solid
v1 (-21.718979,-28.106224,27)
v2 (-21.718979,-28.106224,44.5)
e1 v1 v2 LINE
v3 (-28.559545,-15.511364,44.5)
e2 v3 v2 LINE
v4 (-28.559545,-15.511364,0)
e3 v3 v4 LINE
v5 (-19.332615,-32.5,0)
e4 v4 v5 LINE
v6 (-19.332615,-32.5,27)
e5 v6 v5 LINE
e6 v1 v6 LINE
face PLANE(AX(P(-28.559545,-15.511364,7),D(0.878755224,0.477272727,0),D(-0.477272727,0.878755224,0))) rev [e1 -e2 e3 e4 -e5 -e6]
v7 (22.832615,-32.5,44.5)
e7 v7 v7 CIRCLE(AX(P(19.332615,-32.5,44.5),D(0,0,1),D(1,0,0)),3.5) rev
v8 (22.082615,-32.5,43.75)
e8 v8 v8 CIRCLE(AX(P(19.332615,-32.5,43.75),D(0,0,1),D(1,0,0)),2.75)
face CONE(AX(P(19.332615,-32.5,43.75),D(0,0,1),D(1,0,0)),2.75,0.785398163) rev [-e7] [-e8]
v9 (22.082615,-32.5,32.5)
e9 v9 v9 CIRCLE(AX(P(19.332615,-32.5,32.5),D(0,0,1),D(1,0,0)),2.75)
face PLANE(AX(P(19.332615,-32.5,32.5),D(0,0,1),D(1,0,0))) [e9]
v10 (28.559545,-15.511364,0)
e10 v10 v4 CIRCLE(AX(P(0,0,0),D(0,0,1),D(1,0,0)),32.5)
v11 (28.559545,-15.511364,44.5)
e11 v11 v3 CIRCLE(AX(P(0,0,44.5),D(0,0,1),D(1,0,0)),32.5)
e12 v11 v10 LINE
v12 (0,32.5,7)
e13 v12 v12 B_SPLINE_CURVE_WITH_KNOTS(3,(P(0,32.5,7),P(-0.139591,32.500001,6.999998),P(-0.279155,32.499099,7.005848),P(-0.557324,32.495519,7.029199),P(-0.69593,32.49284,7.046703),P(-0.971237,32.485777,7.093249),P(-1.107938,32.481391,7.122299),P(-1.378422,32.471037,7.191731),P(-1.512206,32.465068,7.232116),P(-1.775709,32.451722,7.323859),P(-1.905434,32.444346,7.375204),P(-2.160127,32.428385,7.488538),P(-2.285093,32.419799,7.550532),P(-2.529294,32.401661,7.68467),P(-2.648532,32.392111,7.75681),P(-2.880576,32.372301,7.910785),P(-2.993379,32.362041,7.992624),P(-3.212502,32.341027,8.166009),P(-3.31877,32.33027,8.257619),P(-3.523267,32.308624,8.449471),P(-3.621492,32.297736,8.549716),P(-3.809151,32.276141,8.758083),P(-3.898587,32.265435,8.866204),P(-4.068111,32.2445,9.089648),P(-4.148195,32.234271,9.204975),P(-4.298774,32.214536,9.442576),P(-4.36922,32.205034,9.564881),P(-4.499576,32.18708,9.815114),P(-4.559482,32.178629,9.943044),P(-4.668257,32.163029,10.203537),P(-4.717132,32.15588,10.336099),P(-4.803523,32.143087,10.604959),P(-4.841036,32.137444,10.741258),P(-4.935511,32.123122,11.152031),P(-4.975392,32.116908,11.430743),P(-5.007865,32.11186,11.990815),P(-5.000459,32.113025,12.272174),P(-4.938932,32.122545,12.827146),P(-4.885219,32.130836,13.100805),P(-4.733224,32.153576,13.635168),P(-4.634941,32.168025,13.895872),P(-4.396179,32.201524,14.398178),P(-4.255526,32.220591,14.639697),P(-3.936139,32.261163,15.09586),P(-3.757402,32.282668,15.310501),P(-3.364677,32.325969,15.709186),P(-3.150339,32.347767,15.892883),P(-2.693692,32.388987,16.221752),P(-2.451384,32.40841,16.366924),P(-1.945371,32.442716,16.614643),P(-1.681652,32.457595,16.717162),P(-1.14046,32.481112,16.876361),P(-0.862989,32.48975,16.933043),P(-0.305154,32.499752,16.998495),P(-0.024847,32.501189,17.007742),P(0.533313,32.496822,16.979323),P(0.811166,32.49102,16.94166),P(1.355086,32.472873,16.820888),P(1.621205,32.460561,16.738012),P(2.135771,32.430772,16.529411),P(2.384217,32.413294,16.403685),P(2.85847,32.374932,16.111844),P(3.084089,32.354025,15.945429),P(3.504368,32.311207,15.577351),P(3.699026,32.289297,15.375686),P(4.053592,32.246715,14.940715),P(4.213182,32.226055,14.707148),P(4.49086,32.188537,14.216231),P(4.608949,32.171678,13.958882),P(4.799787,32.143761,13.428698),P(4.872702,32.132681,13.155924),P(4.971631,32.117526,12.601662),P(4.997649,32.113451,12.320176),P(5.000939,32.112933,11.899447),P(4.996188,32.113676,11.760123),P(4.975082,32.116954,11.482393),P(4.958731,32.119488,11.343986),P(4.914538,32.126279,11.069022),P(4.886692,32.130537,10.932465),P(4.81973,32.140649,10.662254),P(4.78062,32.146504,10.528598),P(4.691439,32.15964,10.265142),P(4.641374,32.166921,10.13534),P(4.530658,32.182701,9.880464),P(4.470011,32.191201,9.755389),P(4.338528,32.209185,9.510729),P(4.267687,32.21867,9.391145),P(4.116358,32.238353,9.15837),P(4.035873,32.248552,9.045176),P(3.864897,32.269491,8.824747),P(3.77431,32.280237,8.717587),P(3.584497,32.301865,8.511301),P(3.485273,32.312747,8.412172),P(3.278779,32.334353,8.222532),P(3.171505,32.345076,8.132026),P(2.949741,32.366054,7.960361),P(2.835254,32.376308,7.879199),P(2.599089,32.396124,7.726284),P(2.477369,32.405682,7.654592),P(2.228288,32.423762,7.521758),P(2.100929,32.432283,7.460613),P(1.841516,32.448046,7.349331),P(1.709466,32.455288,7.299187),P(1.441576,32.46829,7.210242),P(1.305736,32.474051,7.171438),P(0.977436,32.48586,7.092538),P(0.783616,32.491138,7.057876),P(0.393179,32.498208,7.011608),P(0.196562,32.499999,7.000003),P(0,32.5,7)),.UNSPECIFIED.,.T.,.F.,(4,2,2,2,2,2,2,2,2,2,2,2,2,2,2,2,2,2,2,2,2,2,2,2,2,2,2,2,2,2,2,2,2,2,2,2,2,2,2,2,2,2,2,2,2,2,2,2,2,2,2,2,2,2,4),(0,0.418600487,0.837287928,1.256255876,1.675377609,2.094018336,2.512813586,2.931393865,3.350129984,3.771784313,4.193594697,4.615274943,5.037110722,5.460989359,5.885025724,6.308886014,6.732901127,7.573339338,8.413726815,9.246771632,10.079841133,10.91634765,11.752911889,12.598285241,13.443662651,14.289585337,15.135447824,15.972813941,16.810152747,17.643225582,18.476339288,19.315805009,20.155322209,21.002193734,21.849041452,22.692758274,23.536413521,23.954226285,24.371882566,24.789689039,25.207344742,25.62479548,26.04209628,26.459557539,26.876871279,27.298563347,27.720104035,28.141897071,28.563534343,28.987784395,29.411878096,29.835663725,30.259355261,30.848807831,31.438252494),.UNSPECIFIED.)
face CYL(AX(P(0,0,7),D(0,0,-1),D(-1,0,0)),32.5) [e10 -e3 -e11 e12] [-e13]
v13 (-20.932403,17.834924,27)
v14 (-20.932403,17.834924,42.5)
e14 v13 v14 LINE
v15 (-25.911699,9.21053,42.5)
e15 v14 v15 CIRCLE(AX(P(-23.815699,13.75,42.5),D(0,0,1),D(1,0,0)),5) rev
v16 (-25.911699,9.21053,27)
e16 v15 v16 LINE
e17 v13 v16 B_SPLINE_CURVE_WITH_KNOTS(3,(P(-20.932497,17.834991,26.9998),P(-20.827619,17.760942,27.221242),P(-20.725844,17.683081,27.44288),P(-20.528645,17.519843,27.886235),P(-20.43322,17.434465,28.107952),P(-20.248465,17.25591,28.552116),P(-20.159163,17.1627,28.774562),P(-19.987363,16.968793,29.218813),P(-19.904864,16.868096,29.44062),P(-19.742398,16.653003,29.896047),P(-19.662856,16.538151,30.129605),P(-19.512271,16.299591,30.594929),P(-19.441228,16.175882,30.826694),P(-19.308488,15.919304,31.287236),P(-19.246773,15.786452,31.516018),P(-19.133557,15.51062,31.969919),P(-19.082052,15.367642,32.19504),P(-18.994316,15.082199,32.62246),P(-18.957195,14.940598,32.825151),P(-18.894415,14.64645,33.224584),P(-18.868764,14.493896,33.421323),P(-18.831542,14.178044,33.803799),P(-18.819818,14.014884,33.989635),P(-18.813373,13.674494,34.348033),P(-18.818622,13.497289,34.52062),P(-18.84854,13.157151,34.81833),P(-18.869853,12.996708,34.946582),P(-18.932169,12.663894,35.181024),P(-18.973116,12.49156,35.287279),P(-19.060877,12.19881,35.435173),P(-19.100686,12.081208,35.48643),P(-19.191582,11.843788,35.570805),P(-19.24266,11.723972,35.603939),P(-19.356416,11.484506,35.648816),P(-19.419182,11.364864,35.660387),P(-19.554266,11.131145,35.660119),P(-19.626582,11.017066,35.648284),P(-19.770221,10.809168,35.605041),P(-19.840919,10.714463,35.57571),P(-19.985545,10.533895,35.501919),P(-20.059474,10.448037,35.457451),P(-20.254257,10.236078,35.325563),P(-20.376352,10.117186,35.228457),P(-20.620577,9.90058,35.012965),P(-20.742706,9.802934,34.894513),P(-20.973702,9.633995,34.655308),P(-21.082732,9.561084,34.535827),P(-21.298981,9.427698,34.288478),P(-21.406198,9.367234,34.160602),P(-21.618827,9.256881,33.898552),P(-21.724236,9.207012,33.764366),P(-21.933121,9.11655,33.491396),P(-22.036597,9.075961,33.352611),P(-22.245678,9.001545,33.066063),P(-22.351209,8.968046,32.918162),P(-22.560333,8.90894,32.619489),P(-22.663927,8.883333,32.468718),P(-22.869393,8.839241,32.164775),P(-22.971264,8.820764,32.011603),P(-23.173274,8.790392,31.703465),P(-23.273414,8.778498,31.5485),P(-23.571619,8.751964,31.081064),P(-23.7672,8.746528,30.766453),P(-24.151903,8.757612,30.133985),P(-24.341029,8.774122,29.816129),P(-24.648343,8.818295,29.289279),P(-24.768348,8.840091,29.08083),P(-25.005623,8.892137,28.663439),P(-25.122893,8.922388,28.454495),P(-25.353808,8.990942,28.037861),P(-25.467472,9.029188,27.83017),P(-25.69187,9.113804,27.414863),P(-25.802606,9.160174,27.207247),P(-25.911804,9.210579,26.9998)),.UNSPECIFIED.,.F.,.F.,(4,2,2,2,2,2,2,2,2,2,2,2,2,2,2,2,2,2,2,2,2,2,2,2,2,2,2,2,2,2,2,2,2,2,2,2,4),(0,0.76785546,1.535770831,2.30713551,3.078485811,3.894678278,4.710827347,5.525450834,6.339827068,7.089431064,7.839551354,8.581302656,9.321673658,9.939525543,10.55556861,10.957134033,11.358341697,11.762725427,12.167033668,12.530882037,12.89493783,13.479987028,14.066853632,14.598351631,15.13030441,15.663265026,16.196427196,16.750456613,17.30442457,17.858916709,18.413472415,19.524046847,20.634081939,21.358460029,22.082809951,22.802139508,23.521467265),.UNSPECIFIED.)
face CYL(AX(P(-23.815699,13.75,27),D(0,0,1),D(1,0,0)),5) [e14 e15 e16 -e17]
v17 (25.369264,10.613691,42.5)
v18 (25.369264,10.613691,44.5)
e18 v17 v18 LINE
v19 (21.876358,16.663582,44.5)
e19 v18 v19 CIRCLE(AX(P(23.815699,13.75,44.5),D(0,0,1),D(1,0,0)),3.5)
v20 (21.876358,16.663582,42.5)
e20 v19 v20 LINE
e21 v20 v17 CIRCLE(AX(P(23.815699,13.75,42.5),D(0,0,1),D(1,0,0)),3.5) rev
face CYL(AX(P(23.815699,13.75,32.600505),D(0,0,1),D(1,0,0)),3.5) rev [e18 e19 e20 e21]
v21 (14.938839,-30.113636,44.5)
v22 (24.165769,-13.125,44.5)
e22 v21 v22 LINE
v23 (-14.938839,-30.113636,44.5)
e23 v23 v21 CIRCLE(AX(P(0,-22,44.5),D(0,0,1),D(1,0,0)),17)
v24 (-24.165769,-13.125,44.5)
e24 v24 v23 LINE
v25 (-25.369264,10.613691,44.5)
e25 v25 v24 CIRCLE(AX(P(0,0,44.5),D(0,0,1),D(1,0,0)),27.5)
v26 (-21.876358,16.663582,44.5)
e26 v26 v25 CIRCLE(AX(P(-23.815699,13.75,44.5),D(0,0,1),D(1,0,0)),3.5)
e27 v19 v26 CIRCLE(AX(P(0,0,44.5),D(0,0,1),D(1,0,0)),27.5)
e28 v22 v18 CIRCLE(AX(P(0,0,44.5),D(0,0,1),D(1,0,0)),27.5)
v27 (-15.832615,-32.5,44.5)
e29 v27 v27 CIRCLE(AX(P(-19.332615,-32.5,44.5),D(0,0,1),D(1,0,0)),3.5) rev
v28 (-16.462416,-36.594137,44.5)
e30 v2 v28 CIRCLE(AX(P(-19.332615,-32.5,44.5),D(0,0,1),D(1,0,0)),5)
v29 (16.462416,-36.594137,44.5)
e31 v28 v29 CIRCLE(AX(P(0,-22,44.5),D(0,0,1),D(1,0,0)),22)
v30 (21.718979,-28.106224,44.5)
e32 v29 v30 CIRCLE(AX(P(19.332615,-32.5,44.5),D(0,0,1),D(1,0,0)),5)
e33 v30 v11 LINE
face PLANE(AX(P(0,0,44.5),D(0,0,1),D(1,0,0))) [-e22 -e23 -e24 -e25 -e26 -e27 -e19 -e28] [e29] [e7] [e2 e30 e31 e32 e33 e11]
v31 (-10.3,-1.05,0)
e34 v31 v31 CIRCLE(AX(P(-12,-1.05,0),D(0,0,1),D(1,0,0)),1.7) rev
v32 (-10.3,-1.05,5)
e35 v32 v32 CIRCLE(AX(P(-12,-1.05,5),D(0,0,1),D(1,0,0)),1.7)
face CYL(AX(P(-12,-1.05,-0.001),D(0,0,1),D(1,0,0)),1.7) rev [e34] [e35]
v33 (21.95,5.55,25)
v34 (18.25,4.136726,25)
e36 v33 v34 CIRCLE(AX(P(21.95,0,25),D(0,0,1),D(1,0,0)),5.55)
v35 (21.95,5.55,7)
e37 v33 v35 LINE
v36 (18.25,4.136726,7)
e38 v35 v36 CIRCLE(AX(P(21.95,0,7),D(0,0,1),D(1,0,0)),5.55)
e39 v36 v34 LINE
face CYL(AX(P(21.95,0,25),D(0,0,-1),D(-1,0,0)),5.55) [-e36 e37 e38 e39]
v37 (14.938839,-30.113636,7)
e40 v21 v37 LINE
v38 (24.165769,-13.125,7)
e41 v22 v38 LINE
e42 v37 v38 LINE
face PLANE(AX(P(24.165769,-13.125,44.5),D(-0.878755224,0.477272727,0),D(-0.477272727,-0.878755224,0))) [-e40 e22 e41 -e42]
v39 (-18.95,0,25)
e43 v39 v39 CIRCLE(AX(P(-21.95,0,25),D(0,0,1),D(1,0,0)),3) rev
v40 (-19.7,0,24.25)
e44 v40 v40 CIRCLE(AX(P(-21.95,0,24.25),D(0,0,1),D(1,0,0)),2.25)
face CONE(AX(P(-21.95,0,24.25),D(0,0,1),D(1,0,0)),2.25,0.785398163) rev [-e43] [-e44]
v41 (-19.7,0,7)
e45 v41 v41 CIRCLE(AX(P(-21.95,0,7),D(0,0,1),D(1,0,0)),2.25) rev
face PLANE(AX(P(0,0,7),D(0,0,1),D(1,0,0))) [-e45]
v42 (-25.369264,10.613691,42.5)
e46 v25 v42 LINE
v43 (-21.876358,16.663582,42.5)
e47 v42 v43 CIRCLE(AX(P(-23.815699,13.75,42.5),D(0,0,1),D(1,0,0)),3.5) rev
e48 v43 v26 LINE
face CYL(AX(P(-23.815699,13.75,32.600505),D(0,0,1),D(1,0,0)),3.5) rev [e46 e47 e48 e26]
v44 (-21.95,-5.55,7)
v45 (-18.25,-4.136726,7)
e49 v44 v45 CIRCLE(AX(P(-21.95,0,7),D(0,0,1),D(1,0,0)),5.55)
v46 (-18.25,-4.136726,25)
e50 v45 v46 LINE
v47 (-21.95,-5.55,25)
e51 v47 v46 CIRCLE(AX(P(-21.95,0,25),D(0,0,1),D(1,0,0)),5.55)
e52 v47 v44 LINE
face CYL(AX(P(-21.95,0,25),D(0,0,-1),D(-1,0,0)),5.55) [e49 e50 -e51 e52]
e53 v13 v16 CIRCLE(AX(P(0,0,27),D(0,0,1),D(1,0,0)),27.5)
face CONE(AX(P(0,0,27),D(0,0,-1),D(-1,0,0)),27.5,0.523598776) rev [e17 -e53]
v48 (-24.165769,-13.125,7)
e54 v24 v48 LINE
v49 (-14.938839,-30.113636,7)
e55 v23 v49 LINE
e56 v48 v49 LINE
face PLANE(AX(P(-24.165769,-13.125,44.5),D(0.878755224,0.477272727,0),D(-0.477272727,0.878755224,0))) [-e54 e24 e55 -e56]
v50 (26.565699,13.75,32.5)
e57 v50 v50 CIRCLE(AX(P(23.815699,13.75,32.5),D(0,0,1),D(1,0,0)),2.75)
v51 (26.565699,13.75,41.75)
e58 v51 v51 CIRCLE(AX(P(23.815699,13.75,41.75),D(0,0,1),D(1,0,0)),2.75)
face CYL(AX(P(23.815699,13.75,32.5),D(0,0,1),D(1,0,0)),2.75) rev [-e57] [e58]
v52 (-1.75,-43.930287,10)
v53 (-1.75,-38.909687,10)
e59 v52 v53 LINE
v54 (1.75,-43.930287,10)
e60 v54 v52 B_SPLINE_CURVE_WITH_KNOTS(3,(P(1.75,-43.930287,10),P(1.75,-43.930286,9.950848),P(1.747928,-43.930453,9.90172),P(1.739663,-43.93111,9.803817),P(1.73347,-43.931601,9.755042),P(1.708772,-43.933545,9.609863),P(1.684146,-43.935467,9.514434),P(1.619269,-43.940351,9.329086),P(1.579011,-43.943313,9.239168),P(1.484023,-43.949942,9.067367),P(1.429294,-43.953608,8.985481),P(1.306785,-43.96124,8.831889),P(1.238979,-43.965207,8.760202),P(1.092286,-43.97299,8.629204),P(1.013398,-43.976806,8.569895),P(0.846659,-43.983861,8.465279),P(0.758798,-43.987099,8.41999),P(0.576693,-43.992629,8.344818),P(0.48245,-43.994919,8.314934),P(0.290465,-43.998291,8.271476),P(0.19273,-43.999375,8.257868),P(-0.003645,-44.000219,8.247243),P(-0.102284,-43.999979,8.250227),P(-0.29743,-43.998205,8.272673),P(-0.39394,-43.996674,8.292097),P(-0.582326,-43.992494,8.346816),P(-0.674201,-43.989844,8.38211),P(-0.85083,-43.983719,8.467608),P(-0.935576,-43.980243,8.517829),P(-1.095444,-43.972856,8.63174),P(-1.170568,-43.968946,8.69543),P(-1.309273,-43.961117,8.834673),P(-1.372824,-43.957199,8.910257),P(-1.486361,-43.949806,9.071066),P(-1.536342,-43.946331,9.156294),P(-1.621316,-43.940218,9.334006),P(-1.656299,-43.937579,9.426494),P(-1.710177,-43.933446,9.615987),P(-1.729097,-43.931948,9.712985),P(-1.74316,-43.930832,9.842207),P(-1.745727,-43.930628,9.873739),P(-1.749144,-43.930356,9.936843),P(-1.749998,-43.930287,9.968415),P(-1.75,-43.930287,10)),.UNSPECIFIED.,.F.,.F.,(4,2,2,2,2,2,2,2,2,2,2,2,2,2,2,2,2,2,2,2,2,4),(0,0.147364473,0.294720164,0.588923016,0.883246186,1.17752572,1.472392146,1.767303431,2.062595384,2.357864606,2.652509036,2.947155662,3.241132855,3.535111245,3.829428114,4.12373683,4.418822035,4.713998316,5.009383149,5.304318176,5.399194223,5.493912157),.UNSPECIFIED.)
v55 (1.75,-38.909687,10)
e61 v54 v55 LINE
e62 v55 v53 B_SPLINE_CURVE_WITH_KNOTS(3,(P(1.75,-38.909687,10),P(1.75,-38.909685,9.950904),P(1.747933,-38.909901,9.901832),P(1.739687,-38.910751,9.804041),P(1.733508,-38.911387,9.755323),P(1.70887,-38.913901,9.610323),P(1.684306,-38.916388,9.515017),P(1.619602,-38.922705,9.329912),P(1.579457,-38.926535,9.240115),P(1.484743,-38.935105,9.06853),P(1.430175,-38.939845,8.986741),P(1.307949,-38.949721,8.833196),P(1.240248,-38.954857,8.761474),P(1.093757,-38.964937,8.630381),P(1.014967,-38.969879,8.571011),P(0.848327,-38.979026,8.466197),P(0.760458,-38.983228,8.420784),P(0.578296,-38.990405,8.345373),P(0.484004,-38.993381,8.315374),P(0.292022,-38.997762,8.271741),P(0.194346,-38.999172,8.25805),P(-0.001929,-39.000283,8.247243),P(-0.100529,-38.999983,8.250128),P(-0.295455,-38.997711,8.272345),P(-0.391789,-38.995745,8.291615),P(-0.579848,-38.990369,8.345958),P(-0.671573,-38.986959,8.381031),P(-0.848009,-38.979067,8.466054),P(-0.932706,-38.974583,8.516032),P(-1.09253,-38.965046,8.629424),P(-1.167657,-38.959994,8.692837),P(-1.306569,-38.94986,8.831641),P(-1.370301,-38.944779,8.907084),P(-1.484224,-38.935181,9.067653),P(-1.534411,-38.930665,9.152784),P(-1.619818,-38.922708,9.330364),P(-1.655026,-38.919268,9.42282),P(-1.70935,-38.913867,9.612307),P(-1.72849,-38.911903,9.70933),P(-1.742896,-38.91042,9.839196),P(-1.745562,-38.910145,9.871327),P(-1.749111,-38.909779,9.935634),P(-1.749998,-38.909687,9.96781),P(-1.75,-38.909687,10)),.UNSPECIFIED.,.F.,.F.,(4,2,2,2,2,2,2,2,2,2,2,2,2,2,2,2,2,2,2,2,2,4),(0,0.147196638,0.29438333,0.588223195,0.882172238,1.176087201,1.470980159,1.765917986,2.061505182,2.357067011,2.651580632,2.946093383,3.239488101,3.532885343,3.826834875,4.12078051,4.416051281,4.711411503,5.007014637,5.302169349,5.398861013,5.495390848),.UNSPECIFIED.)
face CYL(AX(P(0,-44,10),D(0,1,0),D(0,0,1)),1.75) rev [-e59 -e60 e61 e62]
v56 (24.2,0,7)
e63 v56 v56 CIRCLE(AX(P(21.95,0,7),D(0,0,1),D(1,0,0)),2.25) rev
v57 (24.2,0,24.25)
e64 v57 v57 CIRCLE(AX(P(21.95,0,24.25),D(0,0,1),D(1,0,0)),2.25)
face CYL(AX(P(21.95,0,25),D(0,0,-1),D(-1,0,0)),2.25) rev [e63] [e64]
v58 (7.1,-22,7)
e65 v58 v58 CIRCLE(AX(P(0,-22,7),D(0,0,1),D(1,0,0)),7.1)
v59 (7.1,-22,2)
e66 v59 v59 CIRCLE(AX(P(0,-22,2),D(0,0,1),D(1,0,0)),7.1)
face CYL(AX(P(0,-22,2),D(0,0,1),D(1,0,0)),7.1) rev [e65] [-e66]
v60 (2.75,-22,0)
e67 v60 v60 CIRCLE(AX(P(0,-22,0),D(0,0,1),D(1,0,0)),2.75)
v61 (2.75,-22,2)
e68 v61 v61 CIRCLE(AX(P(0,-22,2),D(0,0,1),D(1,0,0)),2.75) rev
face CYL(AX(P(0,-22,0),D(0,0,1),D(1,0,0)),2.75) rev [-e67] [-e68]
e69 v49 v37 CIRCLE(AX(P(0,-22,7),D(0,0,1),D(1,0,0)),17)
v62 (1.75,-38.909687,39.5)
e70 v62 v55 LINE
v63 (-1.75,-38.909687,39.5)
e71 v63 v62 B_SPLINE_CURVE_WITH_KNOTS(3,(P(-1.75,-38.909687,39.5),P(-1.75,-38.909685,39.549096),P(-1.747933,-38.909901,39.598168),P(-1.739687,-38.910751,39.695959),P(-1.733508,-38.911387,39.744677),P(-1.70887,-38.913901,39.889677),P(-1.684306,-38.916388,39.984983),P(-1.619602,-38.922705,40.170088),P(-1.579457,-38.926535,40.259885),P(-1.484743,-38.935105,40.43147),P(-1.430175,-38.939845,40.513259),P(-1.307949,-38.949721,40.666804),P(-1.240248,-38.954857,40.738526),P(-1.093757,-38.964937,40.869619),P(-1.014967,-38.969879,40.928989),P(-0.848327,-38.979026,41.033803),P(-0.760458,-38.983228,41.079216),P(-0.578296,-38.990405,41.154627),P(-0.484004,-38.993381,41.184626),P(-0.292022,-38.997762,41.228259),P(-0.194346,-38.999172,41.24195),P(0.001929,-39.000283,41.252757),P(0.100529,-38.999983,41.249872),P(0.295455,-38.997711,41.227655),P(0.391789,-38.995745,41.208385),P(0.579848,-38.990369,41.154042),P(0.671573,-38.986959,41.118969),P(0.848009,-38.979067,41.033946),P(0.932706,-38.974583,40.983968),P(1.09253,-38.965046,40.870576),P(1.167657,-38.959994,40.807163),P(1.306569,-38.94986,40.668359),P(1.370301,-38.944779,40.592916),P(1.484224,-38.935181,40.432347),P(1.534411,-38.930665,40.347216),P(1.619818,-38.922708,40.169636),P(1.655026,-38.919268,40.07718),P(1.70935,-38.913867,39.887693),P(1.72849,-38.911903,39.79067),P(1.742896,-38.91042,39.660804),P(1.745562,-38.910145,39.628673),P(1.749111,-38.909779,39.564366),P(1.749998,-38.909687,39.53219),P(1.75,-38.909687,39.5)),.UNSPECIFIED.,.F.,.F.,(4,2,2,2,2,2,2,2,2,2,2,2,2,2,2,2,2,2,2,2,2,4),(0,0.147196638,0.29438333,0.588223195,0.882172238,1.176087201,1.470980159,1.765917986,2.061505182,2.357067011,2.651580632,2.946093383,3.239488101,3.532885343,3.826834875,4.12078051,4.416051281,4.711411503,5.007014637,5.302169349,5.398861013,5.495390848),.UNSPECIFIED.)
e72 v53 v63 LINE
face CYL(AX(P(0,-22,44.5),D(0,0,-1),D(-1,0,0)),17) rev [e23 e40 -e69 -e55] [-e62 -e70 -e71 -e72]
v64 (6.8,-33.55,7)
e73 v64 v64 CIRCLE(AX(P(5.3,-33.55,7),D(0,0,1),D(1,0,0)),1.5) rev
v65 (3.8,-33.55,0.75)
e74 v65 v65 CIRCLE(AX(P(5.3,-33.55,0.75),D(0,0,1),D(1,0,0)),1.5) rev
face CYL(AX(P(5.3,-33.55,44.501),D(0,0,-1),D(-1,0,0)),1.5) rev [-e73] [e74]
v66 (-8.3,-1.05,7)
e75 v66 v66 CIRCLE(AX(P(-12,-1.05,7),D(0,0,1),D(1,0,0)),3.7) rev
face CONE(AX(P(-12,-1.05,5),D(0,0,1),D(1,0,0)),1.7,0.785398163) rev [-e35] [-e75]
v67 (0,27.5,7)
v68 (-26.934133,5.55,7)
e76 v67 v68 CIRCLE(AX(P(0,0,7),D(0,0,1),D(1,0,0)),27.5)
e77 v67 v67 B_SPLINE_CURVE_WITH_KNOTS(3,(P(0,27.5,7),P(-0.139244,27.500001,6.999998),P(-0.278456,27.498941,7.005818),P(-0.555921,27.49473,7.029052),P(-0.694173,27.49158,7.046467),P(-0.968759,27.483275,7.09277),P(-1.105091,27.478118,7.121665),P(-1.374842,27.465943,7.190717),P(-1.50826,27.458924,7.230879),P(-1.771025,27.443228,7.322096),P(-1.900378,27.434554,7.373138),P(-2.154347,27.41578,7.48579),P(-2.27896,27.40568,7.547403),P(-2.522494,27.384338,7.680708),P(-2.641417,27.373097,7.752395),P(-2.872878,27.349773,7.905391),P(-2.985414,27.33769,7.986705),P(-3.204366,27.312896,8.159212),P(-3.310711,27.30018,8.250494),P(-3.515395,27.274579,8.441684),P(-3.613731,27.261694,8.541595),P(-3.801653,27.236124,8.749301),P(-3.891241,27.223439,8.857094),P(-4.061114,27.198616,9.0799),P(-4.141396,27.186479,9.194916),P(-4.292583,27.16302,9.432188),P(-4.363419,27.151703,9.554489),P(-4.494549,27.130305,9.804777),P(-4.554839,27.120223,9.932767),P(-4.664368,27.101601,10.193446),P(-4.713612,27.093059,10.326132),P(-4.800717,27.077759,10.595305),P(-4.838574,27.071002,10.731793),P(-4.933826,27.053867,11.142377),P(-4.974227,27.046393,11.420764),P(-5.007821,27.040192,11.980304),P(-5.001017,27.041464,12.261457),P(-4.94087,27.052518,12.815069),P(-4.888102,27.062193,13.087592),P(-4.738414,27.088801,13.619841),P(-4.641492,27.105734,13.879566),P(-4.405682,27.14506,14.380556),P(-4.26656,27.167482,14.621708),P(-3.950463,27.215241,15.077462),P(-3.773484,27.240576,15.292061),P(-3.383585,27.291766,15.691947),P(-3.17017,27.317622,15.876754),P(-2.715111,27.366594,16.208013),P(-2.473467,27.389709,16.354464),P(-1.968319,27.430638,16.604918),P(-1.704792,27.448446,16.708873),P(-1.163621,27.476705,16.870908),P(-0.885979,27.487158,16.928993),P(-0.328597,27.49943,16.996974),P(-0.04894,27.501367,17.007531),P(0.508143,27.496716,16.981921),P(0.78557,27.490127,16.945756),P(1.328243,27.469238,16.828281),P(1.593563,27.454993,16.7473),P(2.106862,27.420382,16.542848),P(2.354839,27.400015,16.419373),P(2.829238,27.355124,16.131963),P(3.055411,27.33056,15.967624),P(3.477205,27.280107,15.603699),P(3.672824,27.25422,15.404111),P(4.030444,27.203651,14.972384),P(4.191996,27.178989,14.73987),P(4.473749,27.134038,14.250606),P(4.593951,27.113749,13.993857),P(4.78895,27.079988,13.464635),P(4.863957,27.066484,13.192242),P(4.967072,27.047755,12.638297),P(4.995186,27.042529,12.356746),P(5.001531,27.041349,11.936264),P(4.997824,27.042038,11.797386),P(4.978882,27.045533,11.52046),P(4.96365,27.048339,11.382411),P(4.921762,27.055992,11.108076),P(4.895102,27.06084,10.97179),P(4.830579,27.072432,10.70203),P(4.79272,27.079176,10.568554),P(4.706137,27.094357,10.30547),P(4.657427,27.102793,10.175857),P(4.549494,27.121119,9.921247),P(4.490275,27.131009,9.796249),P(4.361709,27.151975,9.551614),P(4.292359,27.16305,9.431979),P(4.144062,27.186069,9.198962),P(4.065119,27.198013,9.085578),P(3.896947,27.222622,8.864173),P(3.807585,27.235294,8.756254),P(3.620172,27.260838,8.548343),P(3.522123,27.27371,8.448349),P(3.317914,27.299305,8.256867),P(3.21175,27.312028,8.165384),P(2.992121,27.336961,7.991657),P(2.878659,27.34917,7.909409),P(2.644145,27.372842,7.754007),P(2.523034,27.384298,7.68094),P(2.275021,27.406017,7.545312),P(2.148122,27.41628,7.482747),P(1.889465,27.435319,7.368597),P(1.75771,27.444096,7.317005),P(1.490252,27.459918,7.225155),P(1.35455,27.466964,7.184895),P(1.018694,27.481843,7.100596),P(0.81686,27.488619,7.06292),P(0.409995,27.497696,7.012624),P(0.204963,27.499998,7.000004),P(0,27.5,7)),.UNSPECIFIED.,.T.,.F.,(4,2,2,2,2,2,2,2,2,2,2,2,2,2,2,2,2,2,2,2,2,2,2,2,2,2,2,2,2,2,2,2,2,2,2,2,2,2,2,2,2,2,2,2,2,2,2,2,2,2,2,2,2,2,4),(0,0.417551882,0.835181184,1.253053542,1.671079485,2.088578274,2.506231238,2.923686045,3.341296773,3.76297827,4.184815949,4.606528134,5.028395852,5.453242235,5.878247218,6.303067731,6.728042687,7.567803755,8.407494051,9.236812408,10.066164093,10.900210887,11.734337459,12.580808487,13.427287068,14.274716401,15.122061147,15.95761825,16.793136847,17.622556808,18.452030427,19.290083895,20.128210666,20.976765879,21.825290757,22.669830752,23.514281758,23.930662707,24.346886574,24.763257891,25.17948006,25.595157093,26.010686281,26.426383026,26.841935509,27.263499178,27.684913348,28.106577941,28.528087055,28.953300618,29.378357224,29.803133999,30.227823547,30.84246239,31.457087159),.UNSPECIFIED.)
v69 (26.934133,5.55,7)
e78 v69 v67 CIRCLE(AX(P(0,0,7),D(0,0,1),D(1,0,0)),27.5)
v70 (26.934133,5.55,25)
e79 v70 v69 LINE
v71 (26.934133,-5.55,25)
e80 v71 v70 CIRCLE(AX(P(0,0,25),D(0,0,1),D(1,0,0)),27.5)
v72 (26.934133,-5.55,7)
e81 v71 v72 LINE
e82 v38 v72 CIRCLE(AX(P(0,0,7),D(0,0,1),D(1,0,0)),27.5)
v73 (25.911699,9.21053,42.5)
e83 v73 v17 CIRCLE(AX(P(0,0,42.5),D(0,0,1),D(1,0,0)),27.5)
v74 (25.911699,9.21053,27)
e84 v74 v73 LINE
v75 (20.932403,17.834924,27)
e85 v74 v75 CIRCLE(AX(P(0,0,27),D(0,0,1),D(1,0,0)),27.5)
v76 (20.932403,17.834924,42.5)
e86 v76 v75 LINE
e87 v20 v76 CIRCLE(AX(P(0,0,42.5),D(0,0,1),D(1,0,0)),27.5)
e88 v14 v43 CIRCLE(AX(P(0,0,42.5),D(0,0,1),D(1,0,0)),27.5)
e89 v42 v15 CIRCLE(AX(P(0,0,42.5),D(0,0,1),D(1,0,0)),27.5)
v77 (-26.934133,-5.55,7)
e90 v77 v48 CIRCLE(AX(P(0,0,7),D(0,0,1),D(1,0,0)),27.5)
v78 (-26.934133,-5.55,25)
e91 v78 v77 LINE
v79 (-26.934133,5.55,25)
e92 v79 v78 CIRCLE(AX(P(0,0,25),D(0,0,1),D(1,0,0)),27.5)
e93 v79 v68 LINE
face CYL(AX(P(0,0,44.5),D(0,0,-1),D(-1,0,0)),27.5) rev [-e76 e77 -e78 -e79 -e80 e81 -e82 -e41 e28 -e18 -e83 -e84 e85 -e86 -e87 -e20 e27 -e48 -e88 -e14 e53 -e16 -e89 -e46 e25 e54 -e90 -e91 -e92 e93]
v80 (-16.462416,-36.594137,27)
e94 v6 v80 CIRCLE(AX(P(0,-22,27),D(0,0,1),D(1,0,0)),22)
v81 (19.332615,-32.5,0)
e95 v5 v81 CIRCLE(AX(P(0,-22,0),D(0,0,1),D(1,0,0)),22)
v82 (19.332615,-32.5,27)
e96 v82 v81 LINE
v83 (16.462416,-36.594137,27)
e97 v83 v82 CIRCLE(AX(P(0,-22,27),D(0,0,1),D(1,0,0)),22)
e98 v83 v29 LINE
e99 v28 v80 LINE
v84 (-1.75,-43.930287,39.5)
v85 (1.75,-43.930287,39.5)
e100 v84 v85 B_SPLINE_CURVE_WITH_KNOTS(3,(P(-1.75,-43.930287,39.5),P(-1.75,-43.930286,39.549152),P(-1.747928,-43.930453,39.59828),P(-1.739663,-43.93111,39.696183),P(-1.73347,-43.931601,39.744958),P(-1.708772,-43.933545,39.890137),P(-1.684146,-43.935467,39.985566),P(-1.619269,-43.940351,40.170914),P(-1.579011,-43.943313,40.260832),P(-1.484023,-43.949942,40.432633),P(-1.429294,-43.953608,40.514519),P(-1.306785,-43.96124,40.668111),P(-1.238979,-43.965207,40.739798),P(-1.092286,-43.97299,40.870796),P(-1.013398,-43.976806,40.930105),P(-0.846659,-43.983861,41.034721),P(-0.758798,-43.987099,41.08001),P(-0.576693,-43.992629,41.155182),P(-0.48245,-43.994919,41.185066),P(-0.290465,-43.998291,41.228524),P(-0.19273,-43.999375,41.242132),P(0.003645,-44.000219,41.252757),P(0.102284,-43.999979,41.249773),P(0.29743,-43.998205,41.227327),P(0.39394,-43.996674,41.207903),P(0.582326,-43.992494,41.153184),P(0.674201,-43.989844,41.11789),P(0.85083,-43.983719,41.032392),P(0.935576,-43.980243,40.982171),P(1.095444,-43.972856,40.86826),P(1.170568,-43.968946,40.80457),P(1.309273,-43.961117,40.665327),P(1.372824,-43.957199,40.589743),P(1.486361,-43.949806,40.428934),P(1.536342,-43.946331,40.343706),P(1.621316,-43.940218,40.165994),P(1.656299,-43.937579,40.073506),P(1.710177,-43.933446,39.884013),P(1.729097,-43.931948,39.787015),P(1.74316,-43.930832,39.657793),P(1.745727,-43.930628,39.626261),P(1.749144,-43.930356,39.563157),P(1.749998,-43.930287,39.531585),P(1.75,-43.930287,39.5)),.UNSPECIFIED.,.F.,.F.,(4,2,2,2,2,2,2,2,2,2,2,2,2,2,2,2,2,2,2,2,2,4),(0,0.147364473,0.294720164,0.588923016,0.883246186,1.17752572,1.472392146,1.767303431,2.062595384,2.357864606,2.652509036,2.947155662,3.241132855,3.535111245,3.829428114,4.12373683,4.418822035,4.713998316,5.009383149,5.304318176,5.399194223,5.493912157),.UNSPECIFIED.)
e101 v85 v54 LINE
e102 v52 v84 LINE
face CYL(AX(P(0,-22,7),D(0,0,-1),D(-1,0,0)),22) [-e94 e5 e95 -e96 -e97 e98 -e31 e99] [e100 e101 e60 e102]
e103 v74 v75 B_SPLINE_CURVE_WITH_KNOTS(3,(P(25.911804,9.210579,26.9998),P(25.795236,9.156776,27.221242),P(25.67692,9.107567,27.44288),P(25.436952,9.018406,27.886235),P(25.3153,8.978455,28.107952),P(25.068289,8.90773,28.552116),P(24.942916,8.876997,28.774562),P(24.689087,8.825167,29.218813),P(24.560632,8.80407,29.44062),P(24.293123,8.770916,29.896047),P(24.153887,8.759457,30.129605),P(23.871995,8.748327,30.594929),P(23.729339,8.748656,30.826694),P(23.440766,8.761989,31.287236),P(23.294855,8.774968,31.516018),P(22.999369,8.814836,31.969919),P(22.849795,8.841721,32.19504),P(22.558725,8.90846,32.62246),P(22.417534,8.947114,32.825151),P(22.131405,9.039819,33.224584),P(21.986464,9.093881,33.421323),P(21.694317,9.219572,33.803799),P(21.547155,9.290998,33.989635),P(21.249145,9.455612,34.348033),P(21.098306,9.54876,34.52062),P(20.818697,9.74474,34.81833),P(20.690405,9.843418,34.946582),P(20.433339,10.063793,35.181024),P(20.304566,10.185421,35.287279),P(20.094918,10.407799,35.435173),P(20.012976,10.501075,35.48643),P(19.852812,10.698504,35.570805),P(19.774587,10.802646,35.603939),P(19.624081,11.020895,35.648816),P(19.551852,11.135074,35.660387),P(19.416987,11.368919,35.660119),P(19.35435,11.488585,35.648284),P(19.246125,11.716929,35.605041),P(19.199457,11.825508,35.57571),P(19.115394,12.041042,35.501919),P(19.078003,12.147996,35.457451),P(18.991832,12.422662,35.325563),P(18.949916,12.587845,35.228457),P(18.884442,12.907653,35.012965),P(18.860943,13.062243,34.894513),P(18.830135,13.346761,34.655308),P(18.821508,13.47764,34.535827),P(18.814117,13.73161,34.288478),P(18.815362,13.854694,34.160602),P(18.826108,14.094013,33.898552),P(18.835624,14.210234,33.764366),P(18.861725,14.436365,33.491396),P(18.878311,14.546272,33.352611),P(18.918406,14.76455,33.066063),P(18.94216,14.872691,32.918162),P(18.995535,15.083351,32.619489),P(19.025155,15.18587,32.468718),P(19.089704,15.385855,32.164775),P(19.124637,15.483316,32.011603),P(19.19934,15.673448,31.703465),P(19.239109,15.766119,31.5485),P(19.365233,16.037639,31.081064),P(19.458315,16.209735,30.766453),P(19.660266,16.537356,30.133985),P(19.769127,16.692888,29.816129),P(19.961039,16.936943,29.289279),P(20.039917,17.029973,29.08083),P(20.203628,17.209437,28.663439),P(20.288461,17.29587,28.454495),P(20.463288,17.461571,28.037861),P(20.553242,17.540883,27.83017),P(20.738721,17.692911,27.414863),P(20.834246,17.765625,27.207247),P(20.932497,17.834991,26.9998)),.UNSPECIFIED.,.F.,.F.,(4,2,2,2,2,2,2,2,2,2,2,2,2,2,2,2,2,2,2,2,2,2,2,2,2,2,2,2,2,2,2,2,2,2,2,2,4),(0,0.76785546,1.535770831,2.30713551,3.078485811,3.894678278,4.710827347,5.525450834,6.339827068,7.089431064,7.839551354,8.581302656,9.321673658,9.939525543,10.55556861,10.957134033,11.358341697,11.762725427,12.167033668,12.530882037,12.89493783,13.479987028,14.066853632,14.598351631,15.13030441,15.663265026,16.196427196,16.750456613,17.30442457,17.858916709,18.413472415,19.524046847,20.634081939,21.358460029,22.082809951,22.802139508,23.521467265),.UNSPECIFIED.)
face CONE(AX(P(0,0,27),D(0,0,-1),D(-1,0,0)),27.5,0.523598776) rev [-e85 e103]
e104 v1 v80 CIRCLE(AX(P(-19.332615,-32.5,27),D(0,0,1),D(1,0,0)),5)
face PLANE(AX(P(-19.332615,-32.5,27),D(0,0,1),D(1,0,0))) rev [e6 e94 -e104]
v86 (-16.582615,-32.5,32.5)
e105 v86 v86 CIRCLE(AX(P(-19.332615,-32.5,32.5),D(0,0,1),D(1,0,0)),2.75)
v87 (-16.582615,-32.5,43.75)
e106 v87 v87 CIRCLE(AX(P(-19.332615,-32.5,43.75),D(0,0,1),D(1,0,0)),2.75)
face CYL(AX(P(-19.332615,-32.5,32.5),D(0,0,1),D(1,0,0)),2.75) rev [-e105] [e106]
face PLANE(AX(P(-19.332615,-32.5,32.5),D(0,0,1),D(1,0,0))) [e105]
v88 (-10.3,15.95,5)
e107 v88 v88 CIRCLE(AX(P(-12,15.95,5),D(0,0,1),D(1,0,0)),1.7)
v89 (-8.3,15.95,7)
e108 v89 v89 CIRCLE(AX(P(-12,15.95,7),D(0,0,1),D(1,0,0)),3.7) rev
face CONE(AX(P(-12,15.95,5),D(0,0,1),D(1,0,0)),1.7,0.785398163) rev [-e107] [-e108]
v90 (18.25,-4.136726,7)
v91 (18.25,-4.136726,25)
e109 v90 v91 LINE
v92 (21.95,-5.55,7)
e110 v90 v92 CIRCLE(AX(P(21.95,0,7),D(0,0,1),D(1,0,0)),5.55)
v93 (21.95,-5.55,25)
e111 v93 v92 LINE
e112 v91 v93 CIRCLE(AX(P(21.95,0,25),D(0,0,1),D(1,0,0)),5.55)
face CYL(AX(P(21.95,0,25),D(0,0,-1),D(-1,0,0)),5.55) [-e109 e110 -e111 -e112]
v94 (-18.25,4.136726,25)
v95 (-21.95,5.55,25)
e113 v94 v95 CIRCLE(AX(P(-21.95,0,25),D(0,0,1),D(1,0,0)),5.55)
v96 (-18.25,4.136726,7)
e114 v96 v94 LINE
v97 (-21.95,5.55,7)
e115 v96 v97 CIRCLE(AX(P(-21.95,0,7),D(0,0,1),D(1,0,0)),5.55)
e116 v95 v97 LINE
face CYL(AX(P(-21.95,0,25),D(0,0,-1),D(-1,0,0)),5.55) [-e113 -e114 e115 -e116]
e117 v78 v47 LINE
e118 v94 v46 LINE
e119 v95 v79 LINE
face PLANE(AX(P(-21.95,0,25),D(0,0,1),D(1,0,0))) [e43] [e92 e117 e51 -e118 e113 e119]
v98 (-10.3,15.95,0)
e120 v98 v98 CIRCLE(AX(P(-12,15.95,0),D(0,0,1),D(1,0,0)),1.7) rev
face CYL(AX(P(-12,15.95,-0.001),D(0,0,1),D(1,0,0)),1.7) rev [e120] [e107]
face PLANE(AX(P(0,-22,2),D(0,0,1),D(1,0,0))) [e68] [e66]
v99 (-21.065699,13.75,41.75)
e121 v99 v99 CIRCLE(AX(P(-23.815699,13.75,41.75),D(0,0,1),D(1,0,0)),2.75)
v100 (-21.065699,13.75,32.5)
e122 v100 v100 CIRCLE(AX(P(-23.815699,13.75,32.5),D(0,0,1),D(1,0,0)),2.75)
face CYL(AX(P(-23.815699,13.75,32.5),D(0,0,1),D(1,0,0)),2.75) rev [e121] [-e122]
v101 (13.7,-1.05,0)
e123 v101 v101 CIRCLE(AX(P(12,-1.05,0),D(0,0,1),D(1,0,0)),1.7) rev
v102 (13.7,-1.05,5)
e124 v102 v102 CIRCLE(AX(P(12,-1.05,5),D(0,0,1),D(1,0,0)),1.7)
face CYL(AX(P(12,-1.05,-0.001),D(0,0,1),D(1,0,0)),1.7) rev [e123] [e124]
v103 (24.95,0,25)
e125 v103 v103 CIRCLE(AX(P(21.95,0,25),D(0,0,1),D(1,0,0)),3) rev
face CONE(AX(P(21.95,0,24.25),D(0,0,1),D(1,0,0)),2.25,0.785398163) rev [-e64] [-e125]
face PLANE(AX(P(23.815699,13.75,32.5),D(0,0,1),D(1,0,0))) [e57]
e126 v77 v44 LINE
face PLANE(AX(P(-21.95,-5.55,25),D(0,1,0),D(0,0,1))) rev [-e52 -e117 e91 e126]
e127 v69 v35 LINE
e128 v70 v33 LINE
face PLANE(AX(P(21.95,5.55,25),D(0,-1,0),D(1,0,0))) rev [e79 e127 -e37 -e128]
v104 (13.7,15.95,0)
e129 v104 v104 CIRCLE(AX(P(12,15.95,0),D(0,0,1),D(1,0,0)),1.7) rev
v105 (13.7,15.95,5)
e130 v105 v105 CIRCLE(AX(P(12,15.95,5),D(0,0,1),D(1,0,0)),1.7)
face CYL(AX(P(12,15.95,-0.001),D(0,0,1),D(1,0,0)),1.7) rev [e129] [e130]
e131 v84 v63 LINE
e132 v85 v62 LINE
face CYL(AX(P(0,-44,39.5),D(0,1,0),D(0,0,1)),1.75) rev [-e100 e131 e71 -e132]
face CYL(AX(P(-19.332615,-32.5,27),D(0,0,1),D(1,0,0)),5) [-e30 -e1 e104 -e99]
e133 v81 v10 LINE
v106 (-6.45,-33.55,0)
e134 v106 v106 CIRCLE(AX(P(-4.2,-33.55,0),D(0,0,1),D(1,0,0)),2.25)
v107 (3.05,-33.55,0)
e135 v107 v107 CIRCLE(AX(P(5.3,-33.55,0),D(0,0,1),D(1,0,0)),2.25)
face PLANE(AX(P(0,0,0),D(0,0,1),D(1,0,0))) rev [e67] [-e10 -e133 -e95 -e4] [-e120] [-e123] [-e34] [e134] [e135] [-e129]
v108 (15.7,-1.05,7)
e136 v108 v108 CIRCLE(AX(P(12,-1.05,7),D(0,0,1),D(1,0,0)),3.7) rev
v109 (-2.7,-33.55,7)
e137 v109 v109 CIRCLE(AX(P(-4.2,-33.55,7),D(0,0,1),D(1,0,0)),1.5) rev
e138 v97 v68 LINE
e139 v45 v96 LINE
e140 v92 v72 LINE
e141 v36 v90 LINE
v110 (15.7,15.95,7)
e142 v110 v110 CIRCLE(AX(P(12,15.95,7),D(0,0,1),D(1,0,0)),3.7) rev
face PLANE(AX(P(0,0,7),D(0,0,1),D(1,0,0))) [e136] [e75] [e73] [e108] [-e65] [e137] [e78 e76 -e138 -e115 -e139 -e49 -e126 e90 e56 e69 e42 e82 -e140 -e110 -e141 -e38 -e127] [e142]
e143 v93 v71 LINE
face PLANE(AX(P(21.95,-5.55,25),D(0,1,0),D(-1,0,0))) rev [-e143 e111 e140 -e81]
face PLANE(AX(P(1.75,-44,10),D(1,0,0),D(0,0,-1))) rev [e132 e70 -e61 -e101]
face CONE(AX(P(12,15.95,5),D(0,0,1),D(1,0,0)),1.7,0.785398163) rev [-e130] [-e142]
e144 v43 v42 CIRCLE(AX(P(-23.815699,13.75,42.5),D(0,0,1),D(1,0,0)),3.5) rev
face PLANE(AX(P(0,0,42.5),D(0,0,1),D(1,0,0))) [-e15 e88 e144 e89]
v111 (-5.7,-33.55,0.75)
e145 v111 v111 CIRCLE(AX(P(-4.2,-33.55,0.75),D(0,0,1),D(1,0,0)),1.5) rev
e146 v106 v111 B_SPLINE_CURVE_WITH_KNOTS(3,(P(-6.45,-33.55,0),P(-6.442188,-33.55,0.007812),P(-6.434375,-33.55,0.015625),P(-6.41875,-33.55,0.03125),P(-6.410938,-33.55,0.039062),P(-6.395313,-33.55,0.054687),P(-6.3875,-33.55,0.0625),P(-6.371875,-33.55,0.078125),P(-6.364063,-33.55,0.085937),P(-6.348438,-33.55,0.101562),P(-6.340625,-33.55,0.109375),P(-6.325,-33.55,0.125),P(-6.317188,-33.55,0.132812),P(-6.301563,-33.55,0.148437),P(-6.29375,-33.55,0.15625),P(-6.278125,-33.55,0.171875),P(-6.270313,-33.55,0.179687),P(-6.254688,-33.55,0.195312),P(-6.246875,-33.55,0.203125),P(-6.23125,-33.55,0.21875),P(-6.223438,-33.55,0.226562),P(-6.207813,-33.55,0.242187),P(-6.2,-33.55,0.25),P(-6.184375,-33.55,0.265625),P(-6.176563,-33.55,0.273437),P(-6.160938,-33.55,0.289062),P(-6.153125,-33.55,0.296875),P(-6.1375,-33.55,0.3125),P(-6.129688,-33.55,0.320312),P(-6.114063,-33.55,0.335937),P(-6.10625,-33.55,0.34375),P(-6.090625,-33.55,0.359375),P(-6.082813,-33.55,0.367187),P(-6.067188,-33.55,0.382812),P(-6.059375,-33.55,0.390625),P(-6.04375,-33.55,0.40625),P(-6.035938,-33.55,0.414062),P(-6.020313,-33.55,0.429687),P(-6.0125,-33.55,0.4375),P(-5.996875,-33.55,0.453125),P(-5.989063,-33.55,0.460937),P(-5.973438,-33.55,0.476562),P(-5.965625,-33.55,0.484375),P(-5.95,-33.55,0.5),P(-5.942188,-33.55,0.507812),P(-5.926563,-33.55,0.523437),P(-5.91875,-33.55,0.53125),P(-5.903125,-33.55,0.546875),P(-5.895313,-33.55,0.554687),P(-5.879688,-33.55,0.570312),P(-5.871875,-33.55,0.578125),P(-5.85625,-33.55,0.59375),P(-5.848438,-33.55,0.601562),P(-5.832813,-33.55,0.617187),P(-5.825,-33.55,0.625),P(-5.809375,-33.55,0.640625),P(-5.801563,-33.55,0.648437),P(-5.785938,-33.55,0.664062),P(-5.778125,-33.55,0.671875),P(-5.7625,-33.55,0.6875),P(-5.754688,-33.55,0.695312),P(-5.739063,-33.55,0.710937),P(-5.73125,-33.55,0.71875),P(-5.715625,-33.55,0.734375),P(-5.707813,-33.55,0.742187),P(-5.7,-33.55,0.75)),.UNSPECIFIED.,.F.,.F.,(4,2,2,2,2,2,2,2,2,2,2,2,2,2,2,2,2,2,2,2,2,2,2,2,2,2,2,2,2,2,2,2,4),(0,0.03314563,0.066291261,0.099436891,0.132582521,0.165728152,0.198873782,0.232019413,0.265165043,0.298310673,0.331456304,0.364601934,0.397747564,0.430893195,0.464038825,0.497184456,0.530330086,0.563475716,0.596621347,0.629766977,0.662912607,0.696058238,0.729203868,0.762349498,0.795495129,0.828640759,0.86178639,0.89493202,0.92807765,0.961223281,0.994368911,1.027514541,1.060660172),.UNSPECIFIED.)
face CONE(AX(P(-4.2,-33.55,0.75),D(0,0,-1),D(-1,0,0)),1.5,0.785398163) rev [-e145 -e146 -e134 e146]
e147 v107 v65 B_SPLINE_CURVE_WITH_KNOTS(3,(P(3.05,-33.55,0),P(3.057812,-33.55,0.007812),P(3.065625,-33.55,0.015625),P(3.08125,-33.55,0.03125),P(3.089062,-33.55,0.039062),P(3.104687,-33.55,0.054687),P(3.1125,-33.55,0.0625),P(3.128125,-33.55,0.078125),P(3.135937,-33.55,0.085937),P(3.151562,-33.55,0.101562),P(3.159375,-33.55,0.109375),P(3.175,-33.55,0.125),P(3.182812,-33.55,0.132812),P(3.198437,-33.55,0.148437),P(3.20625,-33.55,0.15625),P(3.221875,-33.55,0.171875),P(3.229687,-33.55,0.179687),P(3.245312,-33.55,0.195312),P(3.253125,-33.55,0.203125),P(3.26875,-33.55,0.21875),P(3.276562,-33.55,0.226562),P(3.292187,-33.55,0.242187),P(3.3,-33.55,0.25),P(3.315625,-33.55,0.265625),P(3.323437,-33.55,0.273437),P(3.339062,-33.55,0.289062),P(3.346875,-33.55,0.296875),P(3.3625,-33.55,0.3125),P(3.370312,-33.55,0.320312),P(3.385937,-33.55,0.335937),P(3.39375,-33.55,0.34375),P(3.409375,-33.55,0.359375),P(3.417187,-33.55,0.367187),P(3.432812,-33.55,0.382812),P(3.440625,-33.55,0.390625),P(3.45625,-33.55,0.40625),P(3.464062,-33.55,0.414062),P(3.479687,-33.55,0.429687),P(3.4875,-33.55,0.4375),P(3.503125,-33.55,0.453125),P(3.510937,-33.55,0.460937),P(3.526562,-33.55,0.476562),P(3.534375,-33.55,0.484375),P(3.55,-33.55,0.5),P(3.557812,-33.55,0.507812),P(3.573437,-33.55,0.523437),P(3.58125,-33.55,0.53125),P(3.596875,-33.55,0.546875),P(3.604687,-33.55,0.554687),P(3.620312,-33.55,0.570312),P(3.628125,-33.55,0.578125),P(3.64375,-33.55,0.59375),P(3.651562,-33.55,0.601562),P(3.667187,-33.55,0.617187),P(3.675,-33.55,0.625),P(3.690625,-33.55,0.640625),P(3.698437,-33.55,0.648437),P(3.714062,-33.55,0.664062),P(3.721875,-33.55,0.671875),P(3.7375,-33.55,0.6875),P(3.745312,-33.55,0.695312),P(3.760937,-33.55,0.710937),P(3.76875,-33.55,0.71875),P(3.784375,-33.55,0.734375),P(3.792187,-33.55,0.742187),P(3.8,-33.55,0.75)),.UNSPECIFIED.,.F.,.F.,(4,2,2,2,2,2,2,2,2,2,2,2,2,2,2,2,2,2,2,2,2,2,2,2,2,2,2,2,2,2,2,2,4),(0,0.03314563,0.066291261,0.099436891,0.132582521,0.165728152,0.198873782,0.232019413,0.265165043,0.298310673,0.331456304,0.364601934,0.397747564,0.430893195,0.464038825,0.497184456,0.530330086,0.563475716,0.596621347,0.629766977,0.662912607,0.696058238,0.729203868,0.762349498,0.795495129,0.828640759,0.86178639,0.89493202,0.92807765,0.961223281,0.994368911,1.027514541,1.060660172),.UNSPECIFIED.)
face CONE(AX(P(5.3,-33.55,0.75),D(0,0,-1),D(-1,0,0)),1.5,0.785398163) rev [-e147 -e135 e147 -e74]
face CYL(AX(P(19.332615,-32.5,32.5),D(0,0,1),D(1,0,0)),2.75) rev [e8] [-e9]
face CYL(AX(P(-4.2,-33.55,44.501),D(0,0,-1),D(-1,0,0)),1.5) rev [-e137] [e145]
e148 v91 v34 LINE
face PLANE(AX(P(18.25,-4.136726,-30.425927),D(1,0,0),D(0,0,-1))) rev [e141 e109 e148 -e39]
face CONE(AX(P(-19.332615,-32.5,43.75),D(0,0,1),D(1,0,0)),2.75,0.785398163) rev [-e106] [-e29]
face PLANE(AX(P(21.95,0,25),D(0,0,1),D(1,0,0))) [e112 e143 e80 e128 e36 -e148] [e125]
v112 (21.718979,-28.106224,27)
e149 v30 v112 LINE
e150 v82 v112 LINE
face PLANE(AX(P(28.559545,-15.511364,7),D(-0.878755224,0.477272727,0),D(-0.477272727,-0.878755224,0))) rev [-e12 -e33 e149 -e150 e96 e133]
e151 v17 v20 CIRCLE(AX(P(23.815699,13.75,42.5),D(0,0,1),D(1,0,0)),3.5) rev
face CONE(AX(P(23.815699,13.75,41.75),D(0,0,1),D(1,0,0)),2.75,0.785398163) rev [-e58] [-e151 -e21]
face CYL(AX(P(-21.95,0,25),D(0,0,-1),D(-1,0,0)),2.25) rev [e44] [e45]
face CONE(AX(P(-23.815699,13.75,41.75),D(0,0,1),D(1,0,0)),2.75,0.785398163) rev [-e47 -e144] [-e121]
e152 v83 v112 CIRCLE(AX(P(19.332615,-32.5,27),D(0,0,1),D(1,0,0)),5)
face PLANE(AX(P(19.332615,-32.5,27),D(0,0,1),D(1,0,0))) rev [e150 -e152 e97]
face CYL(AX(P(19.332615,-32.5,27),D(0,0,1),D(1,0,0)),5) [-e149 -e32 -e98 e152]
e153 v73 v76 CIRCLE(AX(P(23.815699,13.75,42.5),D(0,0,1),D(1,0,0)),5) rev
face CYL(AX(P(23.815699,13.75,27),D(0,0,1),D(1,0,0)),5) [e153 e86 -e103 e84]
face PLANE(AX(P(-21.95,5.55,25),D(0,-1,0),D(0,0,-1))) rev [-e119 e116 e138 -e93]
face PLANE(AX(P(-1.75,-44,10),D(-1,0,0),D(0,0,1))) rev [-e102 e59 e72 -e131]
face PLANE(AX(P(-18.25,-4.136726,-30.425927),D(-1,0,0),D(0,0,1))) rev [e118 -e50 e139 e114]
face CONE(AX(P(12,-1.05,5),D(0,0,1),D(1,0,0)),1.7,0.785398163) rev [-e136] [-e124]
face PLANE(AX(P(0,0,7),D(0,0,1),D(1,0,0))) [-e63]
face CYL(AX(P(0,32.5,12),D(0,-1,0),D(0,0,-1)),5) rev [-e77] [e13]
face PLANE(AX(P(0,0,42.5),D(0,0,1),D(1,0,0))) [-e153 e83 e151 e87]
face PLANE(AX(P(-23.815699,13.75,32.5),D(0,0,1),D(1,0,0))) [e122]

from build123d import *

# Parameters (mm, degrees)
BOSS_EXTRUDE1_DEPTH = 7
SKETCH2_R           = 2.75
CUT_EXTRUDE1_DEPTH  = 56.14752941
SKETCH3_R           = 7.1
CUT_EXTRUDE2_DEPTH  = 5
BOSS_EXTRUDE2_DEPTH = 37.5
SKETCH5_R           = 2.25
BOSS_EXTRUDE3_DEPTH = 18
CUT_EXTRUDE3_REACH  = 68.321
SKETCH6_R           = 1.7
SKETCH7_R           = 5
BOSS_EXTRUDE4_DEPTH = 17.5
CUT_REVOLVE2_ANGLE  = 145
CUT_EXTRUDE4_START  = -2
CUT_EXTRUDE4_DEPTH  = 2
SKETCH11_R          = 2.75
CUT_EXTRUDE6_DEPTH  = 12
CUT_EXTRUDE7_REACH  = 72.516
SKETCH12_R          = 1.5
CHAMFER1_SIZE       = 2
SKETCH13_W          = 36.5
SKETCH13_H          = 8.273451516
CUT_EXTRUDE9_DEPTH  = 18
CHAMFER2_SIZE       = 0.75
SKETCH14_R          = 3.5
CUT_EXTRUDE10_DEPTH = 2
CHAMFER3_SIZE       = 0.75
CUT_EXTRUDE11_DEPTH = 71.515955641
SKETCH16_R          = 5
CUT_EXTRUDE12_DEPTH = 71.515955785


with BuildPart() as part:
    # Sketch1 → Boss-Extrude1 (new body)
    with BuildSketch(Plane.XY):
        with BuildLine():
            Line((-28.559544782, -15.511363636), (-19.332614929, -32.5))
            ThreePointArc((-19.332614929, -32.5), (0, -44), (19.332614929, -32.5))
            Line((19.332614929, -32.5), (28.559544782, -15.511363636))
            ThreePointArc((28.559544782, -15.511363636), (0, 32.5), (-28.559544782, -15.511363636))
        make_face()
    extrude(amount=BOSS_EXTRUDE1_DEPTH)

    # Sketch2 → Cut-Extrude1 (cut, through all)
    with BuildSketch(Plane.XY.offset(7)):
        with Locations((0, -22)):
            Circle(SKETCH2_R)
    extrude(amount=-CUT_EXTRUDE1_DEPTH, mode=Mode.SUBTRACT)

    # Sketch3 → Cut-Extrude2 (cut)
    with BuildSketch(Plane.XY.offset(7)):
        with Locations((0, -22)):
            Circle(SKETCH3_R)
    extrude(amount=-CUT_EXTRUDE2_DEPTH, mode=Mode.SUBTRACT)

    # Sketch4 → Boss-Extrude2 (add)
    with BuildSketch(Plane.XY.offset(7)):
        with BuildLine():
            Line((-28.559544782, -15.511363636), (-19.332614929, -32.5))
            ThreePointArc((-19.332614929, -32.5), (0, -44), (19.332614929, -32.5))
            Line((19.332614929, -32.5), (28.559544782, -15.511363636))
            ThreePointArc((28.559544782, -15.511363636), (0, 32.5), (-28.559544782, -15.511363636))
        make_face()
        with BuildLine():
            Line((-24.165768661, -13.125), (-14.938838809, -30.113636364))
            ThreePointArc((-14.938838809, -30.113636364), (0, -39), (14.938838809, -30.113636364))
            Line((14.938838809, -30.113636364), (24.165768661, -13.125))
            ThreePointArc((24.165768661, -13.125), (0, 27.5), (-24.165768661, -13.125))
        make_face(mode=Mode.SUBTRACT)
    extrude(amount=BOSS_EXTRUDE2_DEPTH)

    # Sketch5 → Boss-Extrude3 (add)
    # profile 1 of 2: a face of its own
    with BuildSketch(Plane.XY.offset(7)):
        with BuildLine():
            Line((-21.95, 5.55), (-26.93413262, 5.55))
            ThreePointArc((-26.93413262, 5.55), (-27.5, 0), (-26.93413262, -5.55))
            Line((-26.93413262, -5.55), (-21.95, -5.55))
            ThreePointArc((-21.95, -5.55), (-16.4, 0), (-21.95, 5.55))
        make_face()
        with Locations((-21.95, 0)):
            Circle(SKETCH5_R, mode=Mode.SUBTRACT)
    # profile 2 of 2: a face of its own
    with BuildSketch(Plane.XY.offset(7)):
        with BuildLine():
            Line((21.95, 5.55), (26.93413262, 5.55))
            ThreePointArc((26.93413262, 5.55), (27.5, 0), (26.93413262, -5.55))
            Line((26.93413262, -5.55), (21.95, -5.55))
            ThreePointArc((21.95, -5.55), (16.4, 0), (21.95, 5.55))
        make_face()
        with Locations((21.95, 0)):
            Circle(SKETCH5_R, mode=Mode.SUBTRACT)
    extrude(amount=BOSS_EXTRUDE3_DEPTH)

    # Sketch6 → Cut-Extrude3 (cut, up to next)
    with BuildSketch(Plane.XY.offset(7), mode=Mode.PRIVATE) as cut_extrude3_sk1:
        with Locations((-12, 15.95)):
            Circle(SKETCH6_R)
    cut_extrude3_tool1 = extrude(cut_extrude3_sk1.sketch, amount=-CUT_EXTRUDE3_REACH, mode=Mode.PRIVATE) & part.part
    # Sketch6 → Cut-Extrude3 (cut, up to next)
    with BuildSketch(Plane.XY.offset(7), mode=Mode.PRIVATE) as cut_extrude3_sk2:
        with Locations((12, 15.95)):
            Circle(SKETCH6_R)
    cut_extrude3_tool2 = extrude(cut_extrude3_sk2.sketch, amount=-CUT_EXTRUDE3_REACH, mode=Mode.PRIVATE) & part.part
    # Sketch6 → Cut-Extrude3 (cut, up to next)
    with BuildSketch(Plane.XY.offset(7), mode=Mode.PRIVATE) as cut_extrude3_sk3:
        with Locations((-12, -1.05)):
            Circle(SKETCH6_R)
    cut_extrude3_tool3 = extrude(cut_extrude3_sk3.sketch, amount=-CUT_EXTRUDE3_REACH, mode=Mode.PRIVATE) & part.part
    # Sketch6 → Cut-Extrude3 (cut, up to next)
    with BuildSketch(Plane.XY.offset(7), mode=Mode.PRIVATE) as cut_extrude3_sk4:
        with Locations((12, -1.05)):
            Circle(SKETCH6_R)
    cut_extrude3_tool4 = extrude(cut_extrude3_sk4.sketch, amount=-CUT_EXTRUDE3_REACH, mode=Mode.PRIVATE) & part.part
    add(cut_extrude3_tool1.solids().sort_by_distance((-12, 15.95, 7))[0], mode=Mode.SUBTRACT)
    add(cut_extrude3_tool2.solids().sort_by_distance((12, 15.95, 7))[0], mode=Mode.SUBTRACT)
    add(cut_extrude3_tool3.solids().sort_by_distance((-12, -1.05, 7))[0], mode=Mode.SUBTRACT)
    add(cut_extrude3_tool4.solids().sort_by_distance((12, -1.05, 7))[0], mode=Mode.SUBTRACT)

    # Sketch7 → Boss-Extrude4 (add)
    with BuildSketch(Plane.XY.offset(44.5)):
        with Locations((-23.815698604, 13.75)):
            Circle(SKETCH7_R)
        with Locations((23.815698604, 13.75)):
            Circle(SKETCH7_R)
        with Locations((-19.332614929, -32.5)):
            Circle(SKETCH7_R)
        with Locations((19.332614929, -32.5)):
            Circle(SKETCH7_R)
    extrude(amount=-BOSS_EXTRUDE4_DEPTH)

    # Sketch9 → Cut-Revolve2 (revolve, symmetric, cut)
    with BuildSketch(Plane(origin=(0, 0, 0), x_dir=(0, 0, -1), z_dir=(1, 0, 0))) as cut_revolve2_sk:
        Polygon((-27, 27.5), (-35.660254038, 22.5), (-27, 22.5), align=None)
    revolve(axis=Axis((0, 0, 0), (0, 0, 1)), revolution_arc=CUT_REVOLVE2_ANGLE / 2, mode=Mode.SUBTRACT)
    revolve(cut_revolve2_sk.sketch, axis=Axis((0, 0, 0), (0, 0, -1)), revolution_arc=CUT_REVOLVE2_ANGLE / 2, mode=Mode.SUBTRACT)

    # Sketch10 → Cut-Extrude4 (cut)
    with BuildSketch(Plane.XY.offset(44.5).offset(CUT_EXTRUDE4_START)):
        with BuildLine():
            Line((-24.165768661, -13.125), (-14.938838809, -30.113636364))
            ThreePointArc((-14.938838809, -30.113636364), (0, -39), (14.938838809, -30.113636364))
            Line((14.938838809, -30.113636364), (24.165768661, -13.125))
            ThreePointArc((24.165768661, -13.125), (0, 27.5), (-24.165768661, -13.125))
        make_face()
    extrude(amount=CUT_EXTRUDE4_DEPTH, mode=Mode.SUBTRACT)

    # Sketch11 → Cut-Extrude6 (cut)
    with BuildSketch(Plane.XY.offset(44.5)):
        with Locations((-23.815698604, 13.75)):
            Circle(SKETCH11_R)
        with Locations((23.815698604, 13.75)):
            Circle(SKETCH11_R)
        with Locations((-19.332614929, -32.5)):
            Circle(SKETCH11_R)
        with Locations((19.332614929, -32.5)):
            Circle(SKETCH11_R)
    extrude(amount=-CUT_EXTRUDE6_DEPTH, mode=Mode.SUBTRACT)

    # Sketch12 → Cut-Extrude7 (cut, up to next)
    with BuildSketch(Plane(origin=(0, 0, 0), x_dir=(-1, 0, 0), z_dir=(0, 0, -1)), mode=Mode.PRIVATE) as cut_extrude7_sk1:
        with Locations((4.2, -33.55)):
            Circle(SKETCH12_R)
    cut_extrude7_tool1 = extrude(cut_extrude7_sk1.sketch, amount=-CUT_EXTRUDE7_REACH, mode=Mode.PRIVATE) & part.part
    # Sketch12 → Cut-Extrude7 (cut, up to next)
    with BuildSketch(Plane(origin=(0, 0, 0), x_dir=(-1, 0, 0), z_dir=(0, 0, -1)), mode=Mode.PRIVATE) as cut_extrude7_sk2:
        with Locations((-5.3, -33.55)):
            Circle(SKETCH12_R)
    cut_extrude7_tool2 = extrude(cut_extrude7_sk2.sketch, amount=-CUT_EXTRUDE7_REACH, mode=Mode.PRIVATE) & part.part
    add(cut_extrude7_tool1.solids().sort_by_distance((-4.2, -33.55, 0))[0], mode=Mode.SUBTRACT)
    add(cut_extrude7_tool2.solids().sort_by_distance((5.3, -33.55, 0))[0], mode=Mode.SUBTRACT)

    # Chamfer1
    chamfer1_edges = [part.edges().sort_by_distance(p)[0] for p in [
        (10.3, -1.05, 7),
        (-13.7, -1.05, 7),
        (-13.7, 15.95, 7),
        (10.3, 15.95, 7),
    ]]
    chamfer(chamfer1_edges, length=CHAMFER1_SIZE)

    # Sketch13 → Cut-Extrude9 (cut)
    with BuildSketch(Plane.XY.offset(25)):
        Rectangle(SKETCH13_W, SKETCH13_H)
    extrude(amount=-CUT_EXTRUDE9_DEPTH, mode=Mode.SUBTRACT)

    # Chamfer2
    chamfer2_edges = [part.edges().sort_by_distance(p)[0] for p in [
        (-22.082614929, -32.5, 44.5),
        (16.582614929, -32.5, 44.5),
        (-2.7, -33.55, 0),
        (6.8, -33.55, 0),
        (-24.2, 0, 25),
        (19.7, 0, 25),
    ]]
    chamfer(chamfer2_edges, length=CHAMFER2_SIZE)

    # Sketch14 → Cut-Extrude10 (cut)
    with BuildSketch(Plane.XY.offset(44.5)):
        with Locations((-23.815698604, 13.75)):
            Circle(SKETCH14_R)
        with Locations((23.815698604, 13.75)):
            Circle(SKETCH14_R)
    extrude(amount=-CUT_EXTRUDE10_DEPTH, mode=Mode.SUBTRACT)

    # Chamfer3
    chamfer3_edges = [part.edges().sort_by_distance(p)[0] for p in [
        (21.065698604, 13.75, 42.5),
        (-26.565698604, 13.75, 42.5),
    ]]
    chamfer(chamfer3_edges, length=CHAMFER3_SIZE - 0.0001)  # a hair under: the kernel refuses the full size

    # Sketch15 → Cut-Extrude11 (cut, through all)
    with BuildSketch(Plane(origin=(0, 0, 0), x_dir=(1, 0, 0), z_dir=(0, 1, 0))):
        with BuildLine():
            Line((1.75, -10), (1.75, -39.5))
            ThreePointArc((1.75, -39.5), (0, -41.25), (-1.75, -39.5))
            Line((-1.75, -39.5), (-1.75, -10))
            ThreePointArc((-1.75, -10), (0, -8.25), (1.75, -10))
        make_face()
    extrude(amount=-CUT_EXTRUDE11_DEPTH, mode=Mode.SUBTRACT)

    # Sketch16 → Cut-Extrude12 (cut, through all)
    with BuildSketch(Plane(origin=(0, 0, 0), x_dir=(1, 0, 0), z_dir=(0, 1, 0))):
        with Locations(Location((0, -12, 0), (0, 0, 90))):
            Circle(SKETCH16_R)
    extrude(amount=CUT_EXTRUDE12_DEPTH, mode=Mode.SUBTRACT)


solid = part.part
